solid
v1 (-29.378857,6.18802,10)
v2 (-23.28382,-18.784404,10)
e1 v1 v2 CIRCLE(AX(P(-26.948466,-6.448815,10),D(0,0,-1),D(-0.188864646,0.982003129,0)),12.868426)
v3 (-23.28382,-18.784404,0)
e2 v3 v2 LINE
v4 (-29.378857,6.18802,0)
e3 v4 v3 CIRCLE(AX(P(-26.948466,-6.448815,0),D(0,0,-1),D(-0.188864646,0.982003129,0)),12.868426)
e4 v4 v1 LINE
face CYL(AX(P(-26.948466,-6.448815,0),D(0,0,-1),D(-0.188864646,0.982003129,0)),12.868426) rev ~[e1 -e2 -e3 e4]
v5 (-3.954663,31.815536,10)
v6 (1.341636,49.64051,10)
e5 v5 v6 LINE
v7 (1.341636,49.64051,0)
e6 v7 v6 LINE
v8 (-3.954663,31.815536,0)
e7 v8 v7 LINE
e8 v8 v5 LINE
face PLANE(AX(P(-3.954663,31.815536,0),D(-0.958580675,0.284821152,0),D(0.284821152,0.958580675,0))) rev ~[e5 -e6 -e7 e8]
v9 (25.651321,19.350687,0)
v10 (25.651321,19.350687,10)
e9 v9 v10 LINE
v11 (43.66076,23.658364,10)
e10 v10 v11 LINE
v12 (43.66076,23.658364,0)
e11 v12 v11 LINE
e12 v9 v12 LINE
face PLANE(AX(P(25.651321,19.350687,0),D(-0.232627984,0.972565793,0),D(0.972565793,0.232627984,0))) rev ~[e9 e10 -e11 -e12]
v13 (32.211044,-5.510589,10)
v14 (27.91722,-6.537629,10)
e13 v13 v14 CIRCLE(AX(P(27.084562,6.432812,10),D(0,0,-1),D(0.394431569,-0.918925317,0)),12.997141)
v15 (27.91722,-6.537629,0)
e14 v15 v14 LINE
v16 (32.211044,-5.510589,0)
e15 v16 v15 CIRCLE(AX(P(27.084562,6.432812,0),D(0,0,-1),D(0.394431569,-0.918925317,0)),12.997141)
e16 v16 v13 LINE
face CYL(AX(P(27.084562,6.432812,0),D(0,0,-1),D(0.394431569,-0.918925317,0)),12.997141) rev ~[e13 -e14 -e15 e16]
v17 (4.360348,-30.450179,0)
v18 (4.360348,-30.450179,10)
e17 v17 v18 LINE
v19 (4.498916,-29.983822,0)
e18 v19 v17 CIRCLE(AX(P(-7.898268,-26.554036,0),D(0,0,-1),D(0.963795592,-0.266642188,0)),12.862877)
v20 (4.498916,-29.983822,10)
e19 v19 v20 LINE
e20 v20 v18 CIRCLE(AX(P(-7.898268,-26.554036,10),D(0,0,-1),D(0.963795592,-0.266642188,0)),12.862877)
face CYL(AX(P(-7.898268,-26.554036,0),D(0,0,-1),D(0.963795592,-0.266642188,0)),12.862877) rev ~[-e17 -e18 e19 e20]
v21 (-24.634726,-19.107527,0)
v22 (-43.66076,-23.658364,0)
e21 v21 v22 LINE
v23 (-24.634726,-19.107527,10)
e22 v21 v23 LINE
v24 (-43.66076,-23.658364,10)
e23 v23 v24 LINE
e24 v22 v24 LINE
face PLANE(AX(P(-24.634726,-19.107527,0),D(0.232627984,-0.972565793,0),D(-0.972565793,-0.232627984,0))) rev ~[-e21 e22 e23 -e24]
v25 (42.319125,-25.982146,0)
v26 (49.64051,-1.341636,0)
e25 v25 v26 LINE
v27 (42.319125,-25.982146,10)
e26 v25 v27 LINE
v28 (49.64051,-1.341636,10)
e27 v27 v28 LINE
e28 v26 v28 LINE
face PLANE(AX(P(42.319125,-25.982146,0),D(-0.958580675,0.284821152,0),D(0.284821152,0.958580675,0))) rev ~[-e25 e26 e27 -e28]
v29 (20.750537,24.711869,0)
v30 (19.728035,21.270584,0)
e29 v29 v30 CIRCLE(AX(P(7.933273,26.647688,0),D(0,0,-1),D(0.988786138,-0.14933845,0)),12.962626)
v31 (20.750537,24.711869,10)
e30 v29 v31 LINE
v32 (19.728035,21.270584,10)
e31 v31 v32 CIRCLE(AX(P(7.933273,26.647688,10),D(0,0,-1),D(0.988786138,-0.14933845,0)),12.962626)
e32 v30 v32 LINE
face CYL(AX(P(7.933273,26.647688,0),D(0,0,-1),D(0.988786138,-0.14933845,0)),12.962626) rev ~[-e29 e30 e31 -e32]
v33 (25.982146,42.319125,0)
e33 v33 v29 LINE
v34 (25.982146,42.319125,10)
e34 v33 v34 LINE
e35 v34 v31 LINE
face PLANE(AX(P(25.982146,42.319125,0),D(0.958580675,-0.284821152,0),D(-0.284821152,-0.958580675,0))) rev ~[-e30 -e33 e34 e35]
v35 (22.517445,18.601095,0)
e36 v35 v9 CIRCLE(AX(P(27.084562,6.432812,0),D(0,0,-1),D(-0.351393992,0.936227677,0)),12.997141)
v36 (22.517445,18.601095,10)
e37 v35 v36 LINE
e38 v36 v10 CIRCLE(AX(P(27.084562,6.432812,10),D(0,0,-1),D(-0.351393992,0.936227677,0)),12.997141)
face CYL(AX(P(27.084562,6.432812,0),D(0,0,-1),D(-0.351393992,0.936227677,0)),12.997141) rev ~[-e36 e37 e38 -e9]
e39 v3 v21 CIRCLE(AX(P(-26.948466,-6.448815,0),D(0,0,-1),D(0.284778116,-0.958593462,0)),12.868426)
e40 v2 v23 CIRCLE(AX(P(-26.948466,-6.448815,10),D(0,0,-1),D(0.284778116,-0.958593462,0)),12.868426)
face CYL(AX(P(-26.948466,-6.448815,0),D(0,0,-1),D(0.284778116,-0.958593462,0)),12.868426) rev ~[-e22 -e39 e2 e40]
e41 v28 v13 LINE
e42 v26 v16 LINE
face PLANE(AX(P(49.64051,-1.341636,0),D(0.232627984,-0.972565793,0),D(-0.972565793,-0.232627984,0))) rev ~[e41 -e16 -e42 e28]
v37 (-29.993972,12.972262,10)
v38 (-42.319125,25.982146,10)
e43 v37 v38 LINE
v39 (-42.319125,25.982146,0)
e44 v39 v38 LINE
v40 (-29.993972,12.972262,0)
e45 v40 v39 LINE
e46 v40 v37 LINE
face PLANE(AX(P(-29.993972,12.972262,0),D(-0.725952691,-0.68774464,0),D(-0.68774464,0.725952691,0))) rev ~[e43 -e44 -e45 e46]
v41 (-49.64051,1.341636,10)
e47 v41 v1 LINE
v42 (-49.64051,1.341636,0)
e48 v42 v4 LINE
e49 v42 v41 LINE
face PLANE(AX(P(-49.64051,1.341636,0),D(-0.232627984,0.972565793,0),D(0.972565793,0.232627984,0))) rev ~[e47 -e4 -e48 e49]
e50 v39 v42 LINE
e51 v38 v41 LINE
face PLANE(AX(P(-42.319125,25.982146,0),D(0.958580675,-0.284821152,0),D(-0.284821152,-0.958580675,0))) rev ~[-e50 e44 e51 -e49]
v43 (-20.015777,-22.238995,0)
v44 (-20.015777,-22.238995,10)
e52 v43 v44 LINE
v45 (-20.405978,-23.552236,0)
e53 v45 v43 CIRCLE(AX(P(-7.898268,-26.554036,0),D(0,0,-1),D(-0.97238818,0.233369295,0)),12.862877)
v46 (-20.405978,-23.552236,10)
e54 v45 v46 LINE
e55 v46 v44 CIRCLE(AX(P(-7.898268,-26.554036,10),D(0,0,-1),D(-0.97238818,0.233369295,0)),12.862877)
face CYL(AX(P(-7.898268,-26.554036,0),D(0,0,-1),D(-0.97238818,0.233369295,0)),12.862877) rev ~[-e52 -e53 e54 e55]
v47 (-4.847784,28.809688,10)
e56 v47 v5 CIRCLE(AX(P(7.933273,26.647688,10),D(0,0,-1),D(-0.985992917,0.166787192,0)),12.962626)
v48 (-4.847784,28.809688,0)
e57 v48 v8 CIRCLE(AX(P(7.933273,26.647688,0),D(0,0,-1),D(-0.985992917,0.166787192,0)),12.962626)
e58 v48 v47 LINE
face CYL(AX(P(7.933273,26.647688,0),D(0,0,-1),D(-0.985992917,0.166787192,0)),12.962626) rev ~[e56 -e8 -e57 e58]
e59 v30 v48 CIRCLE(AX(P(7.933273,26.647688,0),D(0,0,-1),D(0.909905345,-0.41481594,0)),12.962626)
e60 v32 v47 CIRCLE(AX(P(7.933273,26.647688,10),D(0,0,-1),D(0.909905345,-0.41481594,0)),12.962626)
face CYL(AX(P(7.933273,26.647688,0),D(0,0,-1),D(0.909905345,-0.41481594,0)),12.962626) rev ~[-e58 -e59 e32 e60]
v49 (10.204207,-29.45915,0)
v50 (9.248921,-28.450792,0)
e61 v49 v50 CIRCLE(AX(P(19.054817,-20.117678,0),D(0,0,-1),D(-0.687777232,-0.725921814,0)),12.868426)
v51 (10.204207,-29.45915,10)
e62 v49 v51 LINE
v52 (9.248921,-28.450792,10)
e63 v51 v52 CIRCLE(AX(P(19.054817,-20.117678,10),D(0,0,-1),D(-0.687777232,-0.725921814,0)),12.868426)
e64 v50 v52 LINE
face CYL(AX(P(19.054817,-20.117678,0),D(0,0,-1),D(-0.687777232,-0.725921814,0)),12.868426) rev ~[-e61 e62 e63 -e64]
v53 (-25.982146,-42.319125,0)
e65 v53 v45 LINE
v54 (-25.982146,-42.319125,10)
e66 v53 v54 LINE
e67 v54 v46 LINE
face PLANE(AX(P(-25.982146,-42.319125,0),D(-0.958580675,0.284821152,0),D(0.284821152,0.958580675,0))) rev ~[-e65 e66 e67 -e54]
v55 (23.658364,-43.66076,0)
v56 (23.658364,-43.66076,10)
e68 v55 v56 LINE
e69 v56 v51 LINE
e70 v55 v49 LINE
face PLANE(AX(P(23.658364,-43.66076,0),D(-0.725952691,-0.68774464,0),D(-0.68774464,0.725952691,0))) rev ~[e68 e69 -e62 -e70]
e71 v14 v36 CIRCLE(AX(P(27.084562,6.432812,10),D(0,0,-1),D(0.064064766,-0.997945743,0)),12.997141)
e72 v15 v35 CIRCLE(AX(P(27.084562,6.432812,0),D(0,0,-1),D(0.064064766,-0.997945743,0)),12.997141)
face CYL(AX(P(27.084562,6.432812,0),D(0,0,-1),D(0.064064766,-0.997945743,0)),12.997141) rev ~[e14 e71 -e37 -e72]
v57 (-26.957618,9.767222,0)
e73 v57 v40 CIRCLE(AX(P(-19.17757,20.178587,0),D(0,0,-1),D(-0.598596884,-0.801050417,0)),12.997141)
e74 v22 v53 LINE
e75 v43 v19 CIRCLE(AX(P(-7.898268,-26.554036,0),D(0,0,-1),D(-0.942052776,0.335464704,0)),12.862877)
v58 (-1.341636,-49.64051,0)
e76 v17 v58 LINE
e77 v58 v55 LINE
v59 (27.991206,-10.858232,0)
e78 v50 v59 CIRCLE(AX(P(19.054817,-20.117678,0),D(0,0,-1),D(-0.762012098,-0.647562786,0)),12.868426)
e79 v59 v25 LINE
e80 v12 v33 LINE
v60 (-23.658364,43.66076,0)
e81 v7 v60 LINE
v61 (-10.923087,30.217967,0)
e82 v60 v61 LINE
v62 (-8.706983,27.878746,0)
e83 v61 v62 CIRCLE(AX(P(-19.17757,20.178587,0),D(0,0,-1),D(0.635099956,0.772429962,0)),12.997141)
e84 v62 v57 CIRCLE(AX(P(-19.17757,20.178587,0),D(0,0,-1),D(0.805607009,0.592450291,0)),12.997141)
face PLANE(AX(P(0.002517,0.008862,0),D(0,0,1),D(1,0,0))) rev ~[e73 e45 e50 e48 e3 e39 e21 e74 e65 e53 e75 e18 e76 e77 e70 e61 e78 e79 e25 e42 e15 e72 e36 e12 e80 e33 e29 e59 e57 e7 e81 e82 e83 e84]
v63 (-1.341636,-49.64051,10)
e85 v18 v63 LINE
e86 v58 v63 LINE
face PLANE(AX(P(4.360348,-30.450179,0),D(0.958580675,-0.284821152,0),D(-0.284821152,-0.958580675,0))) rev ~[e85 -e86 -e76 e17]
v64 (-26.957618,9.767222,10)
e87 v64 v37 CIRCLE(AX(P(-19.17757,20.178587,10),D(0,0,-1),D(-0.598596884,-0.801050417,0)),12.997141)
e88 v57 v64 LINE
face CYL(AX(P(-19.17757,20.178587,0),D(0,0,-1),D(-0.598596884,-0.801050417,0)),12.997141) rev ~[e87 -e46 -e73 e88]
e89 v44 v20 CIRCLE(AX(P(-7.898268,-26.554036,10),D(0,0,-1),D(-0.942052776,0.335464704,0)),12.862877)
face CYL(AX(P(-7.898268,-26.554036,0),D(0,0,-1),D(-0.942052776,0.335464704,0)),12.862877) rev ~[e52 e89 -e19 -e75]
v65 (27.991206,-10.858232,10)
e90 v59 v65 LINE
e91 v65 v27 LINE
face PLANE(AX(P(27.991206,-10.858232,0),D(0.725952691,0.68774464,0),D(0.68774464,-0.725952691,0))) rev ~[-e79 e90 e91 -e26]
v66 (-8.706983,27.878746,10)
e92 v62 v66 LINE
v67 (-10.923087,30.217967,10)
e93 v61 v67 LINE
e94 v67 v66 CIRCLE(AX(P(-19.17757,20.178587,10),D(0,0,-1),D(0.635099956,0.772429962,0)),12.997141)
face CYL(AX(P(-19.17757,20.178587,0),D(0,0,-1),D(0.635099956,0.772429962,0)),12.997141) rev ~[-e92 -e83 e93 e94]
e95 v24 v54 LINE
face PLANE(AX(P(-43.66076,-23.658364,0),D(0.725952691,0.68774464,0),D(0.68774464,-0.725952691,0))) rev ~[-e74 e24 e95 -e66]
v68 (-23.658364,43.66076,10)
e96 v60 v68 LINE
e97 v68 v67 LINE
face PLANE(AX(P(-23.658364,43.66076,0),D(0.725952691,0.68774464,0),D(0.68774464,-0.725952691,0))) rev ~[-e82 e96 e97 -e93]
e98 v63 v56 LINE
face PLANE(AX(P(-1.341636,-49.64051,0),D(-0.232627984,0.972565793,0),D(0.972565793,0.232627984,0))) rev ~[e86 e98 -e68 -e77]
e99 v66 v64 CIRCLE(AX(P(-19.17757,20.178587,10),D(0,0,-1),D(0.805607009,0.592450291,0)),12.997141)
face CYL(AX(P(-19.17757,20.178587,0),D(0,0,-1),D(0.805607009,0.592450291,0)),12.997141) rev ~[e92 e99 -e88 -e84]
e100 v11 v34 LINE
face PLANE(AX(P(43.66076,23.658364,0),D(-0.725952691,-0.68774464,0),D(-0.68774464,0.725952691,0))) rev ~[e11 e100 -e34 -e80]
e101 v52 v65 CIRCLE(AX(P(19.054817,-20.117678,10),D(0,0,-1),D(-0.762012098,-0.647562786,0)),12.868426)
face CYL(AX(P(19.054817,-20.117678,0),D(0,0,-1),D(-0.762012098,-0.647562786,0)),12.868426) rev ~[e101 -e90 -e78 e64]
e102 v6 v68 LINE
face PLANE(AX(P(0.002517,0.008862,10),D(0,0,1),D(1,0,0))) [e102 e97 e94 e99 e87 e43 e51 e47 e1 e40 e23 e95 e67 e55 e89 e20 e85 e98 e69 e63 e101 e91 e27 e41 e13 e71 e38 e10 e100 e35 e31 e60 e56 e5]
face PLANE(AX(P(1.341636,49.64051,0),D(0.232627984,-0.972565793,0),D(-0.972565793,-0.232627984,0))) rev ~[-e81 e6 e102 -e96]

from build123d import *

# Parameters (mm, degrees)
F1_DEPTH = 10


# Not quite as in the source:
# - a feature of the source that left no trace in its solid (it failed there, or was rolled back) is left out


with BuildPart() as f1:
    # F0 (on Top) → F1 (new body)
    with BuildSketch(Plane.XY):
        with BuildLine():
            Line((-29.9939722279, 12.9722623931), (-42.3191245349, 25.9821456543))
            Line((-42.3191245349, 25.9821456543), (-49.6405097403, 1.341635914))
            Line((-49.6405097403, 1.341635914), (-29.3788570259, 6.1880200524))
            ThreePointArc((-29.3788570259, 6.1880200524), (-14.4470126823, -3.3975764275), (-23.2838200208, -18.7844042826))
            ThreePointArc((-23.2838200208, -18.7844042826), (-23.9549101464, -18.9642061938), (-24.6347260756, -19.1075274636))
            Line((-24.6347260756, -19.1075274636), (-43.6607604489, -23.658364086))
            Line((-43.6607604489, -23.658364086), (-25.9821456543, -42.3191245349))
            Line((-25.9821456543, -42.3191245349), (-20.4059776484, -23.5522357279))
            ThreePointArc((-20.4059776484, -23.5522357279), (-20.2283734176, -22.8904168158), (-20.0157770781, -22.2389950387))
            ThreePointArc((-20.0157770781, -22.2389950387), (-4.0233304879, -14.28870031), (4.4989162669, -29.9838219872))
            ThreePointArc((4.4989162669, -29.9838219872), (4.4318374321, -30.2176557723), (4.3603484872, -30.4501791902))
            Line((4.3603484872, -30.4501791902), (-1.341635914, -49.6405097403))
            Line((-1.341635914, -49.6405097403), (23.658364086, -43.6607604489))
            Line((23.658364086, -43.6607604489), (10.2042067758, -29.4591496596))
            ThreePointArc((10.2042067758, -29.4591496596), (9.7129486903, -28.9678695182), (9.2489208652, -28.4507922885))
            ThreePointArc((9.2489208652, -28.4507922885), (10.2477999291, -10.735096536), (27.9912063973, -10.8582317502))
            Line((27.9912063973, -10.8582317502), (42.3191245349, -25.9821456543))
            Line((42.3191245349, -25.9821456543), (49.6405097403, -1.341635914))
            Line((49.6405097403, -1.341635914), (32.2110441824, -5.5105892868))
            ThreePointArc((32.2110441824, -5.5105892868), (30.1080602508, -6.2077620929), (27.9172204019, -6.5376288751))
            ThreePointArc((27.9172204019, -6.5376288751), (14.3772643763, 3.7032958994), (22.517444526, 18.6010949497))
            ThreePointArc((22.517444526, 18.6010949497), (24.0610630231, 19.0733865517), (25.6513214754, 19.3506868884))
            Line((25.6513214754, 19.3506868884), (43.6607604489, 23.658364086))
            Line((43.6607604489, 23.658364086), (25.9821456543, 42.3191245349))
            Line((25.9821456543, 42.3191245349), (20.7505372467, 24.7118693081))
            ThreePointArc((20.7505372467, 24.7118693081), (20.3589951368, 22.9556577497), (19.7280350427, 21.2705839763))
            ThreePointArc((19.7280350427, 21.2705839763), (4.1315999448, 14.2550710192), (-4.8477844397, 28.8096876713))
            ThreePointArc((-4.8477844397, 28.8096876713), (-4.4924498123, 30.3397177103), (-3.9546627515, 31.8155360239))
            Line((-3.9546627515, 31.8155360239), (1.341635914, 49.6405097403))
            Line((1.341635914, 49.6405097403), (-23.658364086, 43.6607604489))
            Line((-23.658364086, 43.6607604489), (-10.9230867149, 30.2179673888))
            ThreePointArc((-10.9230867149, 30.2179673888), (-9.7422609409, 29.1173003575), (-8.7069825787, 27.8787463076))
            ThreePointArc((-8.7069825787, 27.8787463076), (-10.0224304809, 10.9531282619), (-26.9576179635, 9.767221714))
            ThreePointArc((-26.9576179635, 9.767221714), (-28.6128792901, 11.2398728194), (-29.9939722279, 12.9722623931))
        make_face()
    extrude(amount=F1_DEPTH)


solid = f1.part
